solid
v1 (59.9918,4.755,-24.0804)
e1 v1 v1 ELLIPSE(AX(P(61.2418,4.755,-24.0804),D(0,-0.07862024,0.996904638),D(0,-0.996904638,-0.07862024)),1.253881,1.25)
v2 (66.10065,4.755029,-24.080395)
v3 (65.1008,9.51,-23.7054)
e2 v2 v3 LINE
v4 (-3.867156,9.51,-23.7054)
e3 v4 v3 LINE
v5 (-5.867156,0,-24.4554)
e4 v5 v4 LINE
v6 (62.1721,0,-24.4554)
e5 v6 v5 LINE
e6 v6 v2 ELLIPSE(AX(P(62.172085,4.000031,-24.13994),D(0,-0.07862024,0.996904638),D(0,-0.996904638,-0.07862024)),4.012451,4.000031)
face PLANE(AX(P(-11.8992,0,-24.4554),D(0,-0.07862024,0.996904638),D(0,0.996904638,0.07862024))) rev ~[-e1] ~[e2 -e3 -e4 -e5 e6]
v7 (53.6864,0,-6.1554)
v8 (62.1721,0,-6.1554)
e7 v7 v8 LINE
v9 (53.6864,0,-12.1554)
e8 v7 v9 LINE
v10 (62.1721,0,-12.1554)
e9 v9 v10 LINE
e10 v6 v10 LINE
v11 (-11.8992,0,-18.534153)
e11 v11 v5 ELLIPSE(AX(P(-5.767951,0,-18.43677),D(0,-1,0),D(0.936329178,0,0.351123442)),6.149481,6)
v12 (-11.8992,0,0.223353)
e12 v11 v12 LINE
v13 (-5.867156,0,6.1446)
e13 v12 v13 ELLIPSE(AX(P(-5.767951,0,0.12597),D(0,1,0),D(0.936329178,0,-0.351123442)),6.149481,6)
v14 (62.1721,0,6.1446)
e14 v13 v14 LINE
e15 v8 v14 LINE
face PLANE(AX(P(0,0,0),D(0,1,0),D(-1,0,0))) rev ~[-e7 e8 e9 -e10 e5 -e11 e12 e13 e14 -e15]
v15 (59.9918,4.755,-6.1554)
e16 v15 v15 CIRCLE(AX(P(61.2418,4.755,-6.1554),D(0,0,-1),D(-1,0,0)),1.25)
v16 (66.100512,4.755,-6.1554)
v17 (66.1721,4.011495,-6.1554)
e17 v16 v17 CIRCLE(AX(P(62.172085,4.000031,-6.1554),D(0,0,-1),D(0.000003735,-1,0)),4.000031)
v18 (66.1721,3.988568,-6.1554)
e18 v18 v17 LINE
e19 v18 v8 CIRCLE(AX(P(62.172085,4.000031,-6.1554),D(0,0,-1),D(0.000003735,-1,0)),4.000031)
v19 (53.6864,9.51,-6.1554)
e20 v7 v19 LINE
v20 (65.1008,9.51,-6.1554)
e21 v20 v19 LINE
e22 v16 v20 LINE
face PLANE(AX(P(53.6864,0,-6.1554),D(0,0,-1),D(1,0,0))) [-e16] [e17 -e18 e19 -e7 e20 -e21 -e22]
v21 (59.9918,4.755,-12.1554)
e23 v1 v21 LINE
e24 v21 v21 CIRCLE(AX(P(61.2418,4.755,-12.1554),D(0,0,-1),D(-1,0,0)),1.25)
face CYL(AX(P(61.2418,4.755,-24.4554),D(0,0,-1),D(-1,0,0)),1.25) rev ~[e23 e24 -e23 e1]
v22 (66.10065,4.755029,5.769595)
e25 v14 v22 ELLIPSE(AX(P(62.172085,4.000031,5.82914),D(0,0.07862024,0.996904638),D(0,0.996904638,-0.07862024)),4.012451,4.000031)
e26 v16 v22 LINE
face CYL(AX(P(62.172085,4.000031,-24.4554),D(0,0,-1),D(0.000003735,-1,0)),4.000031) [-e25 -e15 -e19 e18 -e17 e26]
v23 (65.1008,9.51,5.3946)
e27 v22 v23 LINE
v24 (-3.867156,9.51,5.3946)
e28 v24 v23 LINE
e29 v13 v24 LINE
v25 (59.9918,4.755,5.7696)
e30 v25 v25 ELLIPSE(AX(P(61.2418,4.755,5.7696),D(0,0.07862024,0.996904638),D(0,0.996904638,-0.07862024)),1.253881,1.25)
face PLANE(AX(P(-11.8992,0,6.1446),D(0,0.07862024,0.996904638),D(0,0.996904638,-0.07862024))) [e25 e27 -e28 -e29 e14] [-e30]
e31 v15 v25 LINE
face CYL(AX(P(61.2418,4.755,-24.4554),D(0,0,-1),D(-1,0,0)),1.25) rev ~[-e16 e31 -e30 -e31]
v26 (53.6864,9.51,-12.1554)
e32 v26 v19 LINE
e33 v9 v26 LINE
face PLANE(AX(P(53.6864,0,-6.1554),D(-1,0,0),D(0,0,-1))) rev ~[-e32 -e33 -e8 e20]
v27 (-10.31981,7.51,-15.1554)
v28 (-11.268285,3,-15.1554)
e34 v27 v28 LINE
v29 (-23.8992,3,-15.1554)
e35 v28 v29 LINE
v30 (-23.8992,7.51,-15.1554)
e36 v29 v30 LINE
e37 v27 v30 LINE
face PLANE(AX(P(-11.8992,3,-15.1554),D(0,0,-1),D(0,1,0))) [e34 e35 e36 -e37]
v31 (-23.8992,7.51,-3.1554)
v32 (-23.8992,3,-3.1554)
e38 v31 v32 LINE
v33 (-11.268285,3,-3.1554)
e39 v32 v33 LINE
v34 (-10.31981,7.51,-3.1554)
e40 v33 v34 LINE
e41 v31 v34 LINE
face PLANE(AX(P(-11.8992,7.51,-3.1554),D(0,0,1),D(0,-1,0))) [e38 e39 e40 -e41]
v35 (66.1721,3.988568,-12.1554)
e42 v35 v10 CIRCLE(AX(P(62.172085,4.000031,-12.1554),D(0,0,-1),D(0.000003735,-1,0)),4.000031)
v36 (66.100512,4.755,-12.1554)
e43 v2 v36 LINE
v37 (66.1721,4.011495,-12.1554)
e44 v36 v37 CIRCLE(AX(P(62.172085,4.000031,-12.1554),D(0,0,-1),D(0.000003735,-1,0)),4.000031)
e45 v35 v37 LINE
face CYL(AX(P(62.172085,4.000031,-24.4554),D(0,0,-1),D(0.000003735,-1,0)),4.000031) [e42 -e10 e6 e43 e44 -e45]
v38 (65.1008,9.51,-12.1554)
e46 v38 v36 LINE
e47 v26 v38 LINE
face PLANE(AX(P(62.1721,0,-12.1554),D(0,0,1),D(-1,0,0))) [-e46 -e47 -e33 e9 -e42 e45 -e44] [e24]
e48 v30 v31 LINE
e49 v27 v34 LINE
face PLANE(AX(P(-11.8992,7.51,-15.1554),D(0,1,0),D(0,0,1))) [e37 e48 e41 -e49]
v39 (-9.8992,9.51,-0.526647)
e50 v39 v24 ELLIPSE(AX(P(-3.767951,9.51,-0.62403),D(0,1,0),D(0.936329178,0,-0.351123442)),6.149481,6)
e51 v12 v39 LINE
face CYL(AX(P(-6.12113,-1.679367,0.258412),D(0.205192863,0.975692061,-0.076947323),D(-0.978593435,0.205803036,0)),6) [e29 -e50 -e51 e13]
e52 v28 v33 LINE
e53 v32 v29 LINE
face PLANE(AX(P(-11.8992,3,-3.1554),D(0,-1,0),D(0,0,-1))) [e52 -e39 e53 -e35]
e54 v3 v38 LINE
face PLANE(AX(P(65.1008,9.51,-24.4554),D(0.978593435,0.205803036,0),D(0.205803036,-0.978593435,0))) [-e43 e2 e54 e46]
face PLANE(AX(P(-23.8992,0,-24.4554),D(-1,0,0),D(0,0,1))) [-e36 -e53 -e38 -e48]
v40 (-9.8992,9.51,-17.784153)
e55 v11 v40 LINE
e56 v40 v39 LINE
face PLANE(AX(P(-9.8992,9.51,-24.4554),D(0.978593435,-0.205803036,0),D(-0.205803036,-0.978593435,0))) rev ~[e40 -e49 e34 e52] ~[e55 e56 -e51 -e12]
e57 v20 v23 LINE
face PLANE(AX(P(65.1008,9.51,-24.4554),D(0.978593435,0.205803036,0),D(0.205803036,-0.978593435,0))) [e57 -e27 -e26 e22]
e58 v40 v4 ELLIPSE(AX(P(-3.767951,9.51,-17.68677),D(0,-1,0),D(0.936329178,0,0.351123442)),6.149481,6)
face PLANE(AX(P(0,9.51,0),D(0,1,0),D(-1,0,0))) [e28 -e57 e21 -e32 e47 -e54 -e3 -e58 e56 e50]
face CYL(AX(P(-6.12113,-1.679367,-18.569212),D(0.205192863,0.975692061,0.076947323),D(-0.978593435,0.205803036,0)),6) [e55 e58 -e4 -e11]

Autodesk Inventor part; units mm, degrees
ref_plane "YZ Plane" through (0, 0, 0) normal (1, 0, 0) x (0, 1, 0)
sketch "Sketch1" plane through (0, 0, 0) normal (0, 1, 0) x (-1, 0, 0)
  line L0 (11.8992, 6.1446) -> (-67.1008, 6.1446)
  line L1 (-67.1008, 6.1446) -> (-67.1008, -24.4554)
  line L2 (-67.1008, -24.4554) -> (11.8992, -24.4554)
  line L3 (11.8992, -24.4554) -> (11.8992, 6.1446)
  point P0 (0, 0)
  dimension "d0" = 79
  dimension "d1" = 30.6
extrude "Extrusion1" add sketch "Sketch1" along normal blind 9.51
sketch "Sketch3" plane through (-11.8992, 0, -24.4554) normal (-1, 0, 0) x (0, 0, 1)
  line L0 (0, 9.51) -> (30.6, 9.51) projected
  line L1 (15.3, 9.51) -> (0.75, 9.51)
  line L2 (30.6, 9.51) -> (0, 9.51) projected
  line L3 (0.75, 9.51) -> (29.85, 9.51)
  line L4 (30.6, 0) -> (30.6, 9.51) projected
  line L5 (0, 0) -> (0, 9.51) projected
  line L6 (30.6, 0) -> (0, 0) projected
  line L7 (30.6, 0) -> (29.85, 9.51)
  line L8 (0, 0) -> (0.75, 9.51)
  point P0 (24.4554, 0)
  dimension "d4" = 14.55
  dimension "d5" = 29.1
extrude "Extrusion2" cut sketch "Sketch3" against normal through all contours L0 L8 L5 | L7 L0 L4
ref_plane "Work Plane1" through (67.1008, 0, -24.4554) normal (0, 0, 1) x (-1, 0, 0)
sketch "Sketch5" plane through (67.1008, 0, -24.4554) normal (0, 0, 1) x (-1, 0, 0)
  line L0 (0, -9.51) -> (79, -9.51) projected
  line L1 (79, -9.51) -> (79, 0) projected
  line L2 (0, 0) -> (0, -9.51) projected
  line L3 (79, -9.51) -> (0, -9.51) projected
  line L4 (39.5, -9.51) -> (77, -9.51)
  line L5 (77, -9.51) -> (79, 0)
  line L6 (79, 0) -> (79, -9.51) projected
  line L7 (79, -9.51) -> (79, 0)
  line L8 (39.5, -9.51) -> (2, -9.51)
  line L9 (0, -9.51) -> (0, 0) projected
  line L10 (2, -9.51) -> (0, 0)
  line L11 (0, 0) -> (0, -9.51)
  line L12 (0, -9.51) -> (2, -9.51)
  point P0 (67.1008, 0)
  dimension "d11" = 37.5
  dimension "d12" = 37.5
extrude "Extrusion3" cut sketch "Sketch5" along normal through all
ref_plane "Work Plane2" through (-11.8992, 0, -24.4554) normal (1, 0, 0) x (0, 0, 1)
sketch "Sketch7" plane through (-11.8992, 0, -24.4554) normal (1, 0, 0) x (0, 0, 1)
  line L0 (0, 0) -> (30.6, 0) projected
  line L1 (0.75, -9.51) -> (29.85, -9.51) projected
  line L2 (29.85, -9.51) -> (30.6, 0) projected
  line L3 (0, 0) -> (0.75, -9.51) projected
  line L4 (15.3, 0) -> (15.3, -9.51)
  line L5 (28.0015, -7.51) -> (2.5985, -7.51)
  line L6 (2.5985, -7.51) -> (2.1639, -2)
  line L7 (2.1639, -2) -> (28.4361, -2)
  line L8 (28.4361, -2) -> (28.0015, -7.51)
  line L9 (27.3541, -3) -> (3.2459, -3)
  line L10 (3.2459, -3) -> (3.5227, -6.51)
  line L11 (3.5227, -6.51) -> (27.0773, -6.51)
  line L12 (27.0773, -6.51) -> (27.3541, -3)
  line L13 (15.3, -3) -> (15.3, -7.51)
  line L14 (21.3, -3) -> (9.3, -3)
  line L15 (9.3, -3) -> (9.3, -7.51)
  line L16 (9.3, -7.51) -> (21.3, -7.51)
  line L17 (21.3, -7.51) -> (21.3, -3)
  line L18 (21.3, -3) -> (9.3, -7.51) construction
  line L19 (9.3, -3) -> (21.3, -7.51) construction
  point P0 (24.4554, 0)
  point P1 (15.3, -5.255)
  dimension "d16" = 2
  dimension "d17" = 3
  dimension "d18" = 12
extrude "Extrusion4" add sketch "Sketch7" along normal blind 10 contours L9 L17 L11 L4 | L4 L11 L15 L9 | L5 L15 L11 L4 | L4 L11 L17 L5
sketch "Sketch8" plane through (-11.8992, 0, -24.4554) normal (-1, 0, 0) x (0, 0, 1)
  line L0 (9.3, 7.51) -> (21.3, 7.51) projected
  line L1 (9.3, 3) -> (9.3, 7.51) projected
  line L2 (21.3, 3) -> (9.3, 3) projected
  line L3 (21.3, 7.51) -> (21.3, 3) projected
  point P0 (24.4554, 0)
extrude "Extrusion5" add sketch "Sketch8" along normal blind 12
sketch "Sketch9" plane through (67.1008, 0, -24.4554) normal (0, 0, 1) x (-1, 0, 0)
  line L0 (0, 0) -> (79, 0) projected
  line L1 (2, -9.51) -> (77, -9.51) projected
  line L2 (0, -4.755) -> (79, -4.755)
  line L3 (2, -9.51) -> (0, 0) projected
  line L4 (4.9287, 0) -> (79, 0)
  line L5 (1.0143, -4.8232) -> (2, -9.51)
  arc A0 (4.9287, 0) -> (1.0143, -4.8232) centre (4.9287, -4) ccw
  point P0 (67.1008, 0)
  point P1 (4.9287, 0)
  dimension "d23" = 9.51
  dimension "d24" = 4.755
  dimension "d25" = 4
extrude "Extrusion6" cut sketch "Sketch9" along normal through all
sketch "Sketch10" plane through (67.1008, 0, -24.4554) normal (0, 0, 1) x (-1, 0, 0)
  line L0 (4.9287, 0) -> (79, 0) projected
  line L1 (2, -9.51) -> (77, -9.51) projected
  line L2 (4.9287, -4.755) -> (79, -4.755)
  line L3 (2, -9.51) -> (1.0143, -4.8232) projected
  circle A0 centre (5.859, -4.755) radius 4.755
  circle A1 centre (5.859, -4.755) radius 1.25
  point P0 (67.1008, 0)
  dimension "d28" = 9.51
  dimension "d29" = 4.755
  dimension "d31" = 2.5
extrude "Extrusion7" cut sketch "Sketch10" along normal through all contours A1
sketch "Sketch11" plane through (0, 0, 0) normal (0, -1, 0) x (1, 0, 0)
  line L0 (-11.8992, 6.1446) -> (62.1721, 6.1446) projected
  line L1 (62.1721, -24.4554) -> (-11.8992, -24.4554) projected
  line L2 (-11.8992, -6.1554) -> (62.1721, -6.1554)
  line L3 (62.1721, -12.1554) -> (-11.8992, -12.1554)
  line L4 (25.1364, -6.1554) -> (66.0864, -6.1554)
  line L5 (66.0864, 5.7642) -> (66.0864, -24.075) projected
  line L6 (25.1364, -12.1554) -> (66.0864, -12.1554)
  line L7 (65.1008, 5.3946) -> (65.1008, -23.7054) projected
  line L8 (66.0864, -6.1554) -> (53.6864, -6.1554)
  line L9 (53.6864, -6.1554) -> (53.6864, -12.1554)
  line L10 (66.1721, 5.8291) -> (66.1721, -24.1399) projected
  line L11 (66.0864, -6.1554) -> (66.1721, -6.1554)
  line L12 (66.0864, -12.1554) -> (66.1721, -12.1554)
  point P0 (0, 0)
  dimension "d34" = 12.3
  dimension "d35" = 12.3
  dimension "d36" = 12.4
extrude "Extrusion8" cut sketch "Sketch11" against normal through all
fillet "Fillet1" radius 6 2 edges at (-10.8992, 4.755, 5.7696) (-10.8992, 4.755, -24.0804)
ref_plane "Work Plane3" through (65.1008, 9.51, -16.8054) normal (0.205803, -0.9785934, 0) x (0, 0, -1)
properties part number "ArcherT4U_USB"
